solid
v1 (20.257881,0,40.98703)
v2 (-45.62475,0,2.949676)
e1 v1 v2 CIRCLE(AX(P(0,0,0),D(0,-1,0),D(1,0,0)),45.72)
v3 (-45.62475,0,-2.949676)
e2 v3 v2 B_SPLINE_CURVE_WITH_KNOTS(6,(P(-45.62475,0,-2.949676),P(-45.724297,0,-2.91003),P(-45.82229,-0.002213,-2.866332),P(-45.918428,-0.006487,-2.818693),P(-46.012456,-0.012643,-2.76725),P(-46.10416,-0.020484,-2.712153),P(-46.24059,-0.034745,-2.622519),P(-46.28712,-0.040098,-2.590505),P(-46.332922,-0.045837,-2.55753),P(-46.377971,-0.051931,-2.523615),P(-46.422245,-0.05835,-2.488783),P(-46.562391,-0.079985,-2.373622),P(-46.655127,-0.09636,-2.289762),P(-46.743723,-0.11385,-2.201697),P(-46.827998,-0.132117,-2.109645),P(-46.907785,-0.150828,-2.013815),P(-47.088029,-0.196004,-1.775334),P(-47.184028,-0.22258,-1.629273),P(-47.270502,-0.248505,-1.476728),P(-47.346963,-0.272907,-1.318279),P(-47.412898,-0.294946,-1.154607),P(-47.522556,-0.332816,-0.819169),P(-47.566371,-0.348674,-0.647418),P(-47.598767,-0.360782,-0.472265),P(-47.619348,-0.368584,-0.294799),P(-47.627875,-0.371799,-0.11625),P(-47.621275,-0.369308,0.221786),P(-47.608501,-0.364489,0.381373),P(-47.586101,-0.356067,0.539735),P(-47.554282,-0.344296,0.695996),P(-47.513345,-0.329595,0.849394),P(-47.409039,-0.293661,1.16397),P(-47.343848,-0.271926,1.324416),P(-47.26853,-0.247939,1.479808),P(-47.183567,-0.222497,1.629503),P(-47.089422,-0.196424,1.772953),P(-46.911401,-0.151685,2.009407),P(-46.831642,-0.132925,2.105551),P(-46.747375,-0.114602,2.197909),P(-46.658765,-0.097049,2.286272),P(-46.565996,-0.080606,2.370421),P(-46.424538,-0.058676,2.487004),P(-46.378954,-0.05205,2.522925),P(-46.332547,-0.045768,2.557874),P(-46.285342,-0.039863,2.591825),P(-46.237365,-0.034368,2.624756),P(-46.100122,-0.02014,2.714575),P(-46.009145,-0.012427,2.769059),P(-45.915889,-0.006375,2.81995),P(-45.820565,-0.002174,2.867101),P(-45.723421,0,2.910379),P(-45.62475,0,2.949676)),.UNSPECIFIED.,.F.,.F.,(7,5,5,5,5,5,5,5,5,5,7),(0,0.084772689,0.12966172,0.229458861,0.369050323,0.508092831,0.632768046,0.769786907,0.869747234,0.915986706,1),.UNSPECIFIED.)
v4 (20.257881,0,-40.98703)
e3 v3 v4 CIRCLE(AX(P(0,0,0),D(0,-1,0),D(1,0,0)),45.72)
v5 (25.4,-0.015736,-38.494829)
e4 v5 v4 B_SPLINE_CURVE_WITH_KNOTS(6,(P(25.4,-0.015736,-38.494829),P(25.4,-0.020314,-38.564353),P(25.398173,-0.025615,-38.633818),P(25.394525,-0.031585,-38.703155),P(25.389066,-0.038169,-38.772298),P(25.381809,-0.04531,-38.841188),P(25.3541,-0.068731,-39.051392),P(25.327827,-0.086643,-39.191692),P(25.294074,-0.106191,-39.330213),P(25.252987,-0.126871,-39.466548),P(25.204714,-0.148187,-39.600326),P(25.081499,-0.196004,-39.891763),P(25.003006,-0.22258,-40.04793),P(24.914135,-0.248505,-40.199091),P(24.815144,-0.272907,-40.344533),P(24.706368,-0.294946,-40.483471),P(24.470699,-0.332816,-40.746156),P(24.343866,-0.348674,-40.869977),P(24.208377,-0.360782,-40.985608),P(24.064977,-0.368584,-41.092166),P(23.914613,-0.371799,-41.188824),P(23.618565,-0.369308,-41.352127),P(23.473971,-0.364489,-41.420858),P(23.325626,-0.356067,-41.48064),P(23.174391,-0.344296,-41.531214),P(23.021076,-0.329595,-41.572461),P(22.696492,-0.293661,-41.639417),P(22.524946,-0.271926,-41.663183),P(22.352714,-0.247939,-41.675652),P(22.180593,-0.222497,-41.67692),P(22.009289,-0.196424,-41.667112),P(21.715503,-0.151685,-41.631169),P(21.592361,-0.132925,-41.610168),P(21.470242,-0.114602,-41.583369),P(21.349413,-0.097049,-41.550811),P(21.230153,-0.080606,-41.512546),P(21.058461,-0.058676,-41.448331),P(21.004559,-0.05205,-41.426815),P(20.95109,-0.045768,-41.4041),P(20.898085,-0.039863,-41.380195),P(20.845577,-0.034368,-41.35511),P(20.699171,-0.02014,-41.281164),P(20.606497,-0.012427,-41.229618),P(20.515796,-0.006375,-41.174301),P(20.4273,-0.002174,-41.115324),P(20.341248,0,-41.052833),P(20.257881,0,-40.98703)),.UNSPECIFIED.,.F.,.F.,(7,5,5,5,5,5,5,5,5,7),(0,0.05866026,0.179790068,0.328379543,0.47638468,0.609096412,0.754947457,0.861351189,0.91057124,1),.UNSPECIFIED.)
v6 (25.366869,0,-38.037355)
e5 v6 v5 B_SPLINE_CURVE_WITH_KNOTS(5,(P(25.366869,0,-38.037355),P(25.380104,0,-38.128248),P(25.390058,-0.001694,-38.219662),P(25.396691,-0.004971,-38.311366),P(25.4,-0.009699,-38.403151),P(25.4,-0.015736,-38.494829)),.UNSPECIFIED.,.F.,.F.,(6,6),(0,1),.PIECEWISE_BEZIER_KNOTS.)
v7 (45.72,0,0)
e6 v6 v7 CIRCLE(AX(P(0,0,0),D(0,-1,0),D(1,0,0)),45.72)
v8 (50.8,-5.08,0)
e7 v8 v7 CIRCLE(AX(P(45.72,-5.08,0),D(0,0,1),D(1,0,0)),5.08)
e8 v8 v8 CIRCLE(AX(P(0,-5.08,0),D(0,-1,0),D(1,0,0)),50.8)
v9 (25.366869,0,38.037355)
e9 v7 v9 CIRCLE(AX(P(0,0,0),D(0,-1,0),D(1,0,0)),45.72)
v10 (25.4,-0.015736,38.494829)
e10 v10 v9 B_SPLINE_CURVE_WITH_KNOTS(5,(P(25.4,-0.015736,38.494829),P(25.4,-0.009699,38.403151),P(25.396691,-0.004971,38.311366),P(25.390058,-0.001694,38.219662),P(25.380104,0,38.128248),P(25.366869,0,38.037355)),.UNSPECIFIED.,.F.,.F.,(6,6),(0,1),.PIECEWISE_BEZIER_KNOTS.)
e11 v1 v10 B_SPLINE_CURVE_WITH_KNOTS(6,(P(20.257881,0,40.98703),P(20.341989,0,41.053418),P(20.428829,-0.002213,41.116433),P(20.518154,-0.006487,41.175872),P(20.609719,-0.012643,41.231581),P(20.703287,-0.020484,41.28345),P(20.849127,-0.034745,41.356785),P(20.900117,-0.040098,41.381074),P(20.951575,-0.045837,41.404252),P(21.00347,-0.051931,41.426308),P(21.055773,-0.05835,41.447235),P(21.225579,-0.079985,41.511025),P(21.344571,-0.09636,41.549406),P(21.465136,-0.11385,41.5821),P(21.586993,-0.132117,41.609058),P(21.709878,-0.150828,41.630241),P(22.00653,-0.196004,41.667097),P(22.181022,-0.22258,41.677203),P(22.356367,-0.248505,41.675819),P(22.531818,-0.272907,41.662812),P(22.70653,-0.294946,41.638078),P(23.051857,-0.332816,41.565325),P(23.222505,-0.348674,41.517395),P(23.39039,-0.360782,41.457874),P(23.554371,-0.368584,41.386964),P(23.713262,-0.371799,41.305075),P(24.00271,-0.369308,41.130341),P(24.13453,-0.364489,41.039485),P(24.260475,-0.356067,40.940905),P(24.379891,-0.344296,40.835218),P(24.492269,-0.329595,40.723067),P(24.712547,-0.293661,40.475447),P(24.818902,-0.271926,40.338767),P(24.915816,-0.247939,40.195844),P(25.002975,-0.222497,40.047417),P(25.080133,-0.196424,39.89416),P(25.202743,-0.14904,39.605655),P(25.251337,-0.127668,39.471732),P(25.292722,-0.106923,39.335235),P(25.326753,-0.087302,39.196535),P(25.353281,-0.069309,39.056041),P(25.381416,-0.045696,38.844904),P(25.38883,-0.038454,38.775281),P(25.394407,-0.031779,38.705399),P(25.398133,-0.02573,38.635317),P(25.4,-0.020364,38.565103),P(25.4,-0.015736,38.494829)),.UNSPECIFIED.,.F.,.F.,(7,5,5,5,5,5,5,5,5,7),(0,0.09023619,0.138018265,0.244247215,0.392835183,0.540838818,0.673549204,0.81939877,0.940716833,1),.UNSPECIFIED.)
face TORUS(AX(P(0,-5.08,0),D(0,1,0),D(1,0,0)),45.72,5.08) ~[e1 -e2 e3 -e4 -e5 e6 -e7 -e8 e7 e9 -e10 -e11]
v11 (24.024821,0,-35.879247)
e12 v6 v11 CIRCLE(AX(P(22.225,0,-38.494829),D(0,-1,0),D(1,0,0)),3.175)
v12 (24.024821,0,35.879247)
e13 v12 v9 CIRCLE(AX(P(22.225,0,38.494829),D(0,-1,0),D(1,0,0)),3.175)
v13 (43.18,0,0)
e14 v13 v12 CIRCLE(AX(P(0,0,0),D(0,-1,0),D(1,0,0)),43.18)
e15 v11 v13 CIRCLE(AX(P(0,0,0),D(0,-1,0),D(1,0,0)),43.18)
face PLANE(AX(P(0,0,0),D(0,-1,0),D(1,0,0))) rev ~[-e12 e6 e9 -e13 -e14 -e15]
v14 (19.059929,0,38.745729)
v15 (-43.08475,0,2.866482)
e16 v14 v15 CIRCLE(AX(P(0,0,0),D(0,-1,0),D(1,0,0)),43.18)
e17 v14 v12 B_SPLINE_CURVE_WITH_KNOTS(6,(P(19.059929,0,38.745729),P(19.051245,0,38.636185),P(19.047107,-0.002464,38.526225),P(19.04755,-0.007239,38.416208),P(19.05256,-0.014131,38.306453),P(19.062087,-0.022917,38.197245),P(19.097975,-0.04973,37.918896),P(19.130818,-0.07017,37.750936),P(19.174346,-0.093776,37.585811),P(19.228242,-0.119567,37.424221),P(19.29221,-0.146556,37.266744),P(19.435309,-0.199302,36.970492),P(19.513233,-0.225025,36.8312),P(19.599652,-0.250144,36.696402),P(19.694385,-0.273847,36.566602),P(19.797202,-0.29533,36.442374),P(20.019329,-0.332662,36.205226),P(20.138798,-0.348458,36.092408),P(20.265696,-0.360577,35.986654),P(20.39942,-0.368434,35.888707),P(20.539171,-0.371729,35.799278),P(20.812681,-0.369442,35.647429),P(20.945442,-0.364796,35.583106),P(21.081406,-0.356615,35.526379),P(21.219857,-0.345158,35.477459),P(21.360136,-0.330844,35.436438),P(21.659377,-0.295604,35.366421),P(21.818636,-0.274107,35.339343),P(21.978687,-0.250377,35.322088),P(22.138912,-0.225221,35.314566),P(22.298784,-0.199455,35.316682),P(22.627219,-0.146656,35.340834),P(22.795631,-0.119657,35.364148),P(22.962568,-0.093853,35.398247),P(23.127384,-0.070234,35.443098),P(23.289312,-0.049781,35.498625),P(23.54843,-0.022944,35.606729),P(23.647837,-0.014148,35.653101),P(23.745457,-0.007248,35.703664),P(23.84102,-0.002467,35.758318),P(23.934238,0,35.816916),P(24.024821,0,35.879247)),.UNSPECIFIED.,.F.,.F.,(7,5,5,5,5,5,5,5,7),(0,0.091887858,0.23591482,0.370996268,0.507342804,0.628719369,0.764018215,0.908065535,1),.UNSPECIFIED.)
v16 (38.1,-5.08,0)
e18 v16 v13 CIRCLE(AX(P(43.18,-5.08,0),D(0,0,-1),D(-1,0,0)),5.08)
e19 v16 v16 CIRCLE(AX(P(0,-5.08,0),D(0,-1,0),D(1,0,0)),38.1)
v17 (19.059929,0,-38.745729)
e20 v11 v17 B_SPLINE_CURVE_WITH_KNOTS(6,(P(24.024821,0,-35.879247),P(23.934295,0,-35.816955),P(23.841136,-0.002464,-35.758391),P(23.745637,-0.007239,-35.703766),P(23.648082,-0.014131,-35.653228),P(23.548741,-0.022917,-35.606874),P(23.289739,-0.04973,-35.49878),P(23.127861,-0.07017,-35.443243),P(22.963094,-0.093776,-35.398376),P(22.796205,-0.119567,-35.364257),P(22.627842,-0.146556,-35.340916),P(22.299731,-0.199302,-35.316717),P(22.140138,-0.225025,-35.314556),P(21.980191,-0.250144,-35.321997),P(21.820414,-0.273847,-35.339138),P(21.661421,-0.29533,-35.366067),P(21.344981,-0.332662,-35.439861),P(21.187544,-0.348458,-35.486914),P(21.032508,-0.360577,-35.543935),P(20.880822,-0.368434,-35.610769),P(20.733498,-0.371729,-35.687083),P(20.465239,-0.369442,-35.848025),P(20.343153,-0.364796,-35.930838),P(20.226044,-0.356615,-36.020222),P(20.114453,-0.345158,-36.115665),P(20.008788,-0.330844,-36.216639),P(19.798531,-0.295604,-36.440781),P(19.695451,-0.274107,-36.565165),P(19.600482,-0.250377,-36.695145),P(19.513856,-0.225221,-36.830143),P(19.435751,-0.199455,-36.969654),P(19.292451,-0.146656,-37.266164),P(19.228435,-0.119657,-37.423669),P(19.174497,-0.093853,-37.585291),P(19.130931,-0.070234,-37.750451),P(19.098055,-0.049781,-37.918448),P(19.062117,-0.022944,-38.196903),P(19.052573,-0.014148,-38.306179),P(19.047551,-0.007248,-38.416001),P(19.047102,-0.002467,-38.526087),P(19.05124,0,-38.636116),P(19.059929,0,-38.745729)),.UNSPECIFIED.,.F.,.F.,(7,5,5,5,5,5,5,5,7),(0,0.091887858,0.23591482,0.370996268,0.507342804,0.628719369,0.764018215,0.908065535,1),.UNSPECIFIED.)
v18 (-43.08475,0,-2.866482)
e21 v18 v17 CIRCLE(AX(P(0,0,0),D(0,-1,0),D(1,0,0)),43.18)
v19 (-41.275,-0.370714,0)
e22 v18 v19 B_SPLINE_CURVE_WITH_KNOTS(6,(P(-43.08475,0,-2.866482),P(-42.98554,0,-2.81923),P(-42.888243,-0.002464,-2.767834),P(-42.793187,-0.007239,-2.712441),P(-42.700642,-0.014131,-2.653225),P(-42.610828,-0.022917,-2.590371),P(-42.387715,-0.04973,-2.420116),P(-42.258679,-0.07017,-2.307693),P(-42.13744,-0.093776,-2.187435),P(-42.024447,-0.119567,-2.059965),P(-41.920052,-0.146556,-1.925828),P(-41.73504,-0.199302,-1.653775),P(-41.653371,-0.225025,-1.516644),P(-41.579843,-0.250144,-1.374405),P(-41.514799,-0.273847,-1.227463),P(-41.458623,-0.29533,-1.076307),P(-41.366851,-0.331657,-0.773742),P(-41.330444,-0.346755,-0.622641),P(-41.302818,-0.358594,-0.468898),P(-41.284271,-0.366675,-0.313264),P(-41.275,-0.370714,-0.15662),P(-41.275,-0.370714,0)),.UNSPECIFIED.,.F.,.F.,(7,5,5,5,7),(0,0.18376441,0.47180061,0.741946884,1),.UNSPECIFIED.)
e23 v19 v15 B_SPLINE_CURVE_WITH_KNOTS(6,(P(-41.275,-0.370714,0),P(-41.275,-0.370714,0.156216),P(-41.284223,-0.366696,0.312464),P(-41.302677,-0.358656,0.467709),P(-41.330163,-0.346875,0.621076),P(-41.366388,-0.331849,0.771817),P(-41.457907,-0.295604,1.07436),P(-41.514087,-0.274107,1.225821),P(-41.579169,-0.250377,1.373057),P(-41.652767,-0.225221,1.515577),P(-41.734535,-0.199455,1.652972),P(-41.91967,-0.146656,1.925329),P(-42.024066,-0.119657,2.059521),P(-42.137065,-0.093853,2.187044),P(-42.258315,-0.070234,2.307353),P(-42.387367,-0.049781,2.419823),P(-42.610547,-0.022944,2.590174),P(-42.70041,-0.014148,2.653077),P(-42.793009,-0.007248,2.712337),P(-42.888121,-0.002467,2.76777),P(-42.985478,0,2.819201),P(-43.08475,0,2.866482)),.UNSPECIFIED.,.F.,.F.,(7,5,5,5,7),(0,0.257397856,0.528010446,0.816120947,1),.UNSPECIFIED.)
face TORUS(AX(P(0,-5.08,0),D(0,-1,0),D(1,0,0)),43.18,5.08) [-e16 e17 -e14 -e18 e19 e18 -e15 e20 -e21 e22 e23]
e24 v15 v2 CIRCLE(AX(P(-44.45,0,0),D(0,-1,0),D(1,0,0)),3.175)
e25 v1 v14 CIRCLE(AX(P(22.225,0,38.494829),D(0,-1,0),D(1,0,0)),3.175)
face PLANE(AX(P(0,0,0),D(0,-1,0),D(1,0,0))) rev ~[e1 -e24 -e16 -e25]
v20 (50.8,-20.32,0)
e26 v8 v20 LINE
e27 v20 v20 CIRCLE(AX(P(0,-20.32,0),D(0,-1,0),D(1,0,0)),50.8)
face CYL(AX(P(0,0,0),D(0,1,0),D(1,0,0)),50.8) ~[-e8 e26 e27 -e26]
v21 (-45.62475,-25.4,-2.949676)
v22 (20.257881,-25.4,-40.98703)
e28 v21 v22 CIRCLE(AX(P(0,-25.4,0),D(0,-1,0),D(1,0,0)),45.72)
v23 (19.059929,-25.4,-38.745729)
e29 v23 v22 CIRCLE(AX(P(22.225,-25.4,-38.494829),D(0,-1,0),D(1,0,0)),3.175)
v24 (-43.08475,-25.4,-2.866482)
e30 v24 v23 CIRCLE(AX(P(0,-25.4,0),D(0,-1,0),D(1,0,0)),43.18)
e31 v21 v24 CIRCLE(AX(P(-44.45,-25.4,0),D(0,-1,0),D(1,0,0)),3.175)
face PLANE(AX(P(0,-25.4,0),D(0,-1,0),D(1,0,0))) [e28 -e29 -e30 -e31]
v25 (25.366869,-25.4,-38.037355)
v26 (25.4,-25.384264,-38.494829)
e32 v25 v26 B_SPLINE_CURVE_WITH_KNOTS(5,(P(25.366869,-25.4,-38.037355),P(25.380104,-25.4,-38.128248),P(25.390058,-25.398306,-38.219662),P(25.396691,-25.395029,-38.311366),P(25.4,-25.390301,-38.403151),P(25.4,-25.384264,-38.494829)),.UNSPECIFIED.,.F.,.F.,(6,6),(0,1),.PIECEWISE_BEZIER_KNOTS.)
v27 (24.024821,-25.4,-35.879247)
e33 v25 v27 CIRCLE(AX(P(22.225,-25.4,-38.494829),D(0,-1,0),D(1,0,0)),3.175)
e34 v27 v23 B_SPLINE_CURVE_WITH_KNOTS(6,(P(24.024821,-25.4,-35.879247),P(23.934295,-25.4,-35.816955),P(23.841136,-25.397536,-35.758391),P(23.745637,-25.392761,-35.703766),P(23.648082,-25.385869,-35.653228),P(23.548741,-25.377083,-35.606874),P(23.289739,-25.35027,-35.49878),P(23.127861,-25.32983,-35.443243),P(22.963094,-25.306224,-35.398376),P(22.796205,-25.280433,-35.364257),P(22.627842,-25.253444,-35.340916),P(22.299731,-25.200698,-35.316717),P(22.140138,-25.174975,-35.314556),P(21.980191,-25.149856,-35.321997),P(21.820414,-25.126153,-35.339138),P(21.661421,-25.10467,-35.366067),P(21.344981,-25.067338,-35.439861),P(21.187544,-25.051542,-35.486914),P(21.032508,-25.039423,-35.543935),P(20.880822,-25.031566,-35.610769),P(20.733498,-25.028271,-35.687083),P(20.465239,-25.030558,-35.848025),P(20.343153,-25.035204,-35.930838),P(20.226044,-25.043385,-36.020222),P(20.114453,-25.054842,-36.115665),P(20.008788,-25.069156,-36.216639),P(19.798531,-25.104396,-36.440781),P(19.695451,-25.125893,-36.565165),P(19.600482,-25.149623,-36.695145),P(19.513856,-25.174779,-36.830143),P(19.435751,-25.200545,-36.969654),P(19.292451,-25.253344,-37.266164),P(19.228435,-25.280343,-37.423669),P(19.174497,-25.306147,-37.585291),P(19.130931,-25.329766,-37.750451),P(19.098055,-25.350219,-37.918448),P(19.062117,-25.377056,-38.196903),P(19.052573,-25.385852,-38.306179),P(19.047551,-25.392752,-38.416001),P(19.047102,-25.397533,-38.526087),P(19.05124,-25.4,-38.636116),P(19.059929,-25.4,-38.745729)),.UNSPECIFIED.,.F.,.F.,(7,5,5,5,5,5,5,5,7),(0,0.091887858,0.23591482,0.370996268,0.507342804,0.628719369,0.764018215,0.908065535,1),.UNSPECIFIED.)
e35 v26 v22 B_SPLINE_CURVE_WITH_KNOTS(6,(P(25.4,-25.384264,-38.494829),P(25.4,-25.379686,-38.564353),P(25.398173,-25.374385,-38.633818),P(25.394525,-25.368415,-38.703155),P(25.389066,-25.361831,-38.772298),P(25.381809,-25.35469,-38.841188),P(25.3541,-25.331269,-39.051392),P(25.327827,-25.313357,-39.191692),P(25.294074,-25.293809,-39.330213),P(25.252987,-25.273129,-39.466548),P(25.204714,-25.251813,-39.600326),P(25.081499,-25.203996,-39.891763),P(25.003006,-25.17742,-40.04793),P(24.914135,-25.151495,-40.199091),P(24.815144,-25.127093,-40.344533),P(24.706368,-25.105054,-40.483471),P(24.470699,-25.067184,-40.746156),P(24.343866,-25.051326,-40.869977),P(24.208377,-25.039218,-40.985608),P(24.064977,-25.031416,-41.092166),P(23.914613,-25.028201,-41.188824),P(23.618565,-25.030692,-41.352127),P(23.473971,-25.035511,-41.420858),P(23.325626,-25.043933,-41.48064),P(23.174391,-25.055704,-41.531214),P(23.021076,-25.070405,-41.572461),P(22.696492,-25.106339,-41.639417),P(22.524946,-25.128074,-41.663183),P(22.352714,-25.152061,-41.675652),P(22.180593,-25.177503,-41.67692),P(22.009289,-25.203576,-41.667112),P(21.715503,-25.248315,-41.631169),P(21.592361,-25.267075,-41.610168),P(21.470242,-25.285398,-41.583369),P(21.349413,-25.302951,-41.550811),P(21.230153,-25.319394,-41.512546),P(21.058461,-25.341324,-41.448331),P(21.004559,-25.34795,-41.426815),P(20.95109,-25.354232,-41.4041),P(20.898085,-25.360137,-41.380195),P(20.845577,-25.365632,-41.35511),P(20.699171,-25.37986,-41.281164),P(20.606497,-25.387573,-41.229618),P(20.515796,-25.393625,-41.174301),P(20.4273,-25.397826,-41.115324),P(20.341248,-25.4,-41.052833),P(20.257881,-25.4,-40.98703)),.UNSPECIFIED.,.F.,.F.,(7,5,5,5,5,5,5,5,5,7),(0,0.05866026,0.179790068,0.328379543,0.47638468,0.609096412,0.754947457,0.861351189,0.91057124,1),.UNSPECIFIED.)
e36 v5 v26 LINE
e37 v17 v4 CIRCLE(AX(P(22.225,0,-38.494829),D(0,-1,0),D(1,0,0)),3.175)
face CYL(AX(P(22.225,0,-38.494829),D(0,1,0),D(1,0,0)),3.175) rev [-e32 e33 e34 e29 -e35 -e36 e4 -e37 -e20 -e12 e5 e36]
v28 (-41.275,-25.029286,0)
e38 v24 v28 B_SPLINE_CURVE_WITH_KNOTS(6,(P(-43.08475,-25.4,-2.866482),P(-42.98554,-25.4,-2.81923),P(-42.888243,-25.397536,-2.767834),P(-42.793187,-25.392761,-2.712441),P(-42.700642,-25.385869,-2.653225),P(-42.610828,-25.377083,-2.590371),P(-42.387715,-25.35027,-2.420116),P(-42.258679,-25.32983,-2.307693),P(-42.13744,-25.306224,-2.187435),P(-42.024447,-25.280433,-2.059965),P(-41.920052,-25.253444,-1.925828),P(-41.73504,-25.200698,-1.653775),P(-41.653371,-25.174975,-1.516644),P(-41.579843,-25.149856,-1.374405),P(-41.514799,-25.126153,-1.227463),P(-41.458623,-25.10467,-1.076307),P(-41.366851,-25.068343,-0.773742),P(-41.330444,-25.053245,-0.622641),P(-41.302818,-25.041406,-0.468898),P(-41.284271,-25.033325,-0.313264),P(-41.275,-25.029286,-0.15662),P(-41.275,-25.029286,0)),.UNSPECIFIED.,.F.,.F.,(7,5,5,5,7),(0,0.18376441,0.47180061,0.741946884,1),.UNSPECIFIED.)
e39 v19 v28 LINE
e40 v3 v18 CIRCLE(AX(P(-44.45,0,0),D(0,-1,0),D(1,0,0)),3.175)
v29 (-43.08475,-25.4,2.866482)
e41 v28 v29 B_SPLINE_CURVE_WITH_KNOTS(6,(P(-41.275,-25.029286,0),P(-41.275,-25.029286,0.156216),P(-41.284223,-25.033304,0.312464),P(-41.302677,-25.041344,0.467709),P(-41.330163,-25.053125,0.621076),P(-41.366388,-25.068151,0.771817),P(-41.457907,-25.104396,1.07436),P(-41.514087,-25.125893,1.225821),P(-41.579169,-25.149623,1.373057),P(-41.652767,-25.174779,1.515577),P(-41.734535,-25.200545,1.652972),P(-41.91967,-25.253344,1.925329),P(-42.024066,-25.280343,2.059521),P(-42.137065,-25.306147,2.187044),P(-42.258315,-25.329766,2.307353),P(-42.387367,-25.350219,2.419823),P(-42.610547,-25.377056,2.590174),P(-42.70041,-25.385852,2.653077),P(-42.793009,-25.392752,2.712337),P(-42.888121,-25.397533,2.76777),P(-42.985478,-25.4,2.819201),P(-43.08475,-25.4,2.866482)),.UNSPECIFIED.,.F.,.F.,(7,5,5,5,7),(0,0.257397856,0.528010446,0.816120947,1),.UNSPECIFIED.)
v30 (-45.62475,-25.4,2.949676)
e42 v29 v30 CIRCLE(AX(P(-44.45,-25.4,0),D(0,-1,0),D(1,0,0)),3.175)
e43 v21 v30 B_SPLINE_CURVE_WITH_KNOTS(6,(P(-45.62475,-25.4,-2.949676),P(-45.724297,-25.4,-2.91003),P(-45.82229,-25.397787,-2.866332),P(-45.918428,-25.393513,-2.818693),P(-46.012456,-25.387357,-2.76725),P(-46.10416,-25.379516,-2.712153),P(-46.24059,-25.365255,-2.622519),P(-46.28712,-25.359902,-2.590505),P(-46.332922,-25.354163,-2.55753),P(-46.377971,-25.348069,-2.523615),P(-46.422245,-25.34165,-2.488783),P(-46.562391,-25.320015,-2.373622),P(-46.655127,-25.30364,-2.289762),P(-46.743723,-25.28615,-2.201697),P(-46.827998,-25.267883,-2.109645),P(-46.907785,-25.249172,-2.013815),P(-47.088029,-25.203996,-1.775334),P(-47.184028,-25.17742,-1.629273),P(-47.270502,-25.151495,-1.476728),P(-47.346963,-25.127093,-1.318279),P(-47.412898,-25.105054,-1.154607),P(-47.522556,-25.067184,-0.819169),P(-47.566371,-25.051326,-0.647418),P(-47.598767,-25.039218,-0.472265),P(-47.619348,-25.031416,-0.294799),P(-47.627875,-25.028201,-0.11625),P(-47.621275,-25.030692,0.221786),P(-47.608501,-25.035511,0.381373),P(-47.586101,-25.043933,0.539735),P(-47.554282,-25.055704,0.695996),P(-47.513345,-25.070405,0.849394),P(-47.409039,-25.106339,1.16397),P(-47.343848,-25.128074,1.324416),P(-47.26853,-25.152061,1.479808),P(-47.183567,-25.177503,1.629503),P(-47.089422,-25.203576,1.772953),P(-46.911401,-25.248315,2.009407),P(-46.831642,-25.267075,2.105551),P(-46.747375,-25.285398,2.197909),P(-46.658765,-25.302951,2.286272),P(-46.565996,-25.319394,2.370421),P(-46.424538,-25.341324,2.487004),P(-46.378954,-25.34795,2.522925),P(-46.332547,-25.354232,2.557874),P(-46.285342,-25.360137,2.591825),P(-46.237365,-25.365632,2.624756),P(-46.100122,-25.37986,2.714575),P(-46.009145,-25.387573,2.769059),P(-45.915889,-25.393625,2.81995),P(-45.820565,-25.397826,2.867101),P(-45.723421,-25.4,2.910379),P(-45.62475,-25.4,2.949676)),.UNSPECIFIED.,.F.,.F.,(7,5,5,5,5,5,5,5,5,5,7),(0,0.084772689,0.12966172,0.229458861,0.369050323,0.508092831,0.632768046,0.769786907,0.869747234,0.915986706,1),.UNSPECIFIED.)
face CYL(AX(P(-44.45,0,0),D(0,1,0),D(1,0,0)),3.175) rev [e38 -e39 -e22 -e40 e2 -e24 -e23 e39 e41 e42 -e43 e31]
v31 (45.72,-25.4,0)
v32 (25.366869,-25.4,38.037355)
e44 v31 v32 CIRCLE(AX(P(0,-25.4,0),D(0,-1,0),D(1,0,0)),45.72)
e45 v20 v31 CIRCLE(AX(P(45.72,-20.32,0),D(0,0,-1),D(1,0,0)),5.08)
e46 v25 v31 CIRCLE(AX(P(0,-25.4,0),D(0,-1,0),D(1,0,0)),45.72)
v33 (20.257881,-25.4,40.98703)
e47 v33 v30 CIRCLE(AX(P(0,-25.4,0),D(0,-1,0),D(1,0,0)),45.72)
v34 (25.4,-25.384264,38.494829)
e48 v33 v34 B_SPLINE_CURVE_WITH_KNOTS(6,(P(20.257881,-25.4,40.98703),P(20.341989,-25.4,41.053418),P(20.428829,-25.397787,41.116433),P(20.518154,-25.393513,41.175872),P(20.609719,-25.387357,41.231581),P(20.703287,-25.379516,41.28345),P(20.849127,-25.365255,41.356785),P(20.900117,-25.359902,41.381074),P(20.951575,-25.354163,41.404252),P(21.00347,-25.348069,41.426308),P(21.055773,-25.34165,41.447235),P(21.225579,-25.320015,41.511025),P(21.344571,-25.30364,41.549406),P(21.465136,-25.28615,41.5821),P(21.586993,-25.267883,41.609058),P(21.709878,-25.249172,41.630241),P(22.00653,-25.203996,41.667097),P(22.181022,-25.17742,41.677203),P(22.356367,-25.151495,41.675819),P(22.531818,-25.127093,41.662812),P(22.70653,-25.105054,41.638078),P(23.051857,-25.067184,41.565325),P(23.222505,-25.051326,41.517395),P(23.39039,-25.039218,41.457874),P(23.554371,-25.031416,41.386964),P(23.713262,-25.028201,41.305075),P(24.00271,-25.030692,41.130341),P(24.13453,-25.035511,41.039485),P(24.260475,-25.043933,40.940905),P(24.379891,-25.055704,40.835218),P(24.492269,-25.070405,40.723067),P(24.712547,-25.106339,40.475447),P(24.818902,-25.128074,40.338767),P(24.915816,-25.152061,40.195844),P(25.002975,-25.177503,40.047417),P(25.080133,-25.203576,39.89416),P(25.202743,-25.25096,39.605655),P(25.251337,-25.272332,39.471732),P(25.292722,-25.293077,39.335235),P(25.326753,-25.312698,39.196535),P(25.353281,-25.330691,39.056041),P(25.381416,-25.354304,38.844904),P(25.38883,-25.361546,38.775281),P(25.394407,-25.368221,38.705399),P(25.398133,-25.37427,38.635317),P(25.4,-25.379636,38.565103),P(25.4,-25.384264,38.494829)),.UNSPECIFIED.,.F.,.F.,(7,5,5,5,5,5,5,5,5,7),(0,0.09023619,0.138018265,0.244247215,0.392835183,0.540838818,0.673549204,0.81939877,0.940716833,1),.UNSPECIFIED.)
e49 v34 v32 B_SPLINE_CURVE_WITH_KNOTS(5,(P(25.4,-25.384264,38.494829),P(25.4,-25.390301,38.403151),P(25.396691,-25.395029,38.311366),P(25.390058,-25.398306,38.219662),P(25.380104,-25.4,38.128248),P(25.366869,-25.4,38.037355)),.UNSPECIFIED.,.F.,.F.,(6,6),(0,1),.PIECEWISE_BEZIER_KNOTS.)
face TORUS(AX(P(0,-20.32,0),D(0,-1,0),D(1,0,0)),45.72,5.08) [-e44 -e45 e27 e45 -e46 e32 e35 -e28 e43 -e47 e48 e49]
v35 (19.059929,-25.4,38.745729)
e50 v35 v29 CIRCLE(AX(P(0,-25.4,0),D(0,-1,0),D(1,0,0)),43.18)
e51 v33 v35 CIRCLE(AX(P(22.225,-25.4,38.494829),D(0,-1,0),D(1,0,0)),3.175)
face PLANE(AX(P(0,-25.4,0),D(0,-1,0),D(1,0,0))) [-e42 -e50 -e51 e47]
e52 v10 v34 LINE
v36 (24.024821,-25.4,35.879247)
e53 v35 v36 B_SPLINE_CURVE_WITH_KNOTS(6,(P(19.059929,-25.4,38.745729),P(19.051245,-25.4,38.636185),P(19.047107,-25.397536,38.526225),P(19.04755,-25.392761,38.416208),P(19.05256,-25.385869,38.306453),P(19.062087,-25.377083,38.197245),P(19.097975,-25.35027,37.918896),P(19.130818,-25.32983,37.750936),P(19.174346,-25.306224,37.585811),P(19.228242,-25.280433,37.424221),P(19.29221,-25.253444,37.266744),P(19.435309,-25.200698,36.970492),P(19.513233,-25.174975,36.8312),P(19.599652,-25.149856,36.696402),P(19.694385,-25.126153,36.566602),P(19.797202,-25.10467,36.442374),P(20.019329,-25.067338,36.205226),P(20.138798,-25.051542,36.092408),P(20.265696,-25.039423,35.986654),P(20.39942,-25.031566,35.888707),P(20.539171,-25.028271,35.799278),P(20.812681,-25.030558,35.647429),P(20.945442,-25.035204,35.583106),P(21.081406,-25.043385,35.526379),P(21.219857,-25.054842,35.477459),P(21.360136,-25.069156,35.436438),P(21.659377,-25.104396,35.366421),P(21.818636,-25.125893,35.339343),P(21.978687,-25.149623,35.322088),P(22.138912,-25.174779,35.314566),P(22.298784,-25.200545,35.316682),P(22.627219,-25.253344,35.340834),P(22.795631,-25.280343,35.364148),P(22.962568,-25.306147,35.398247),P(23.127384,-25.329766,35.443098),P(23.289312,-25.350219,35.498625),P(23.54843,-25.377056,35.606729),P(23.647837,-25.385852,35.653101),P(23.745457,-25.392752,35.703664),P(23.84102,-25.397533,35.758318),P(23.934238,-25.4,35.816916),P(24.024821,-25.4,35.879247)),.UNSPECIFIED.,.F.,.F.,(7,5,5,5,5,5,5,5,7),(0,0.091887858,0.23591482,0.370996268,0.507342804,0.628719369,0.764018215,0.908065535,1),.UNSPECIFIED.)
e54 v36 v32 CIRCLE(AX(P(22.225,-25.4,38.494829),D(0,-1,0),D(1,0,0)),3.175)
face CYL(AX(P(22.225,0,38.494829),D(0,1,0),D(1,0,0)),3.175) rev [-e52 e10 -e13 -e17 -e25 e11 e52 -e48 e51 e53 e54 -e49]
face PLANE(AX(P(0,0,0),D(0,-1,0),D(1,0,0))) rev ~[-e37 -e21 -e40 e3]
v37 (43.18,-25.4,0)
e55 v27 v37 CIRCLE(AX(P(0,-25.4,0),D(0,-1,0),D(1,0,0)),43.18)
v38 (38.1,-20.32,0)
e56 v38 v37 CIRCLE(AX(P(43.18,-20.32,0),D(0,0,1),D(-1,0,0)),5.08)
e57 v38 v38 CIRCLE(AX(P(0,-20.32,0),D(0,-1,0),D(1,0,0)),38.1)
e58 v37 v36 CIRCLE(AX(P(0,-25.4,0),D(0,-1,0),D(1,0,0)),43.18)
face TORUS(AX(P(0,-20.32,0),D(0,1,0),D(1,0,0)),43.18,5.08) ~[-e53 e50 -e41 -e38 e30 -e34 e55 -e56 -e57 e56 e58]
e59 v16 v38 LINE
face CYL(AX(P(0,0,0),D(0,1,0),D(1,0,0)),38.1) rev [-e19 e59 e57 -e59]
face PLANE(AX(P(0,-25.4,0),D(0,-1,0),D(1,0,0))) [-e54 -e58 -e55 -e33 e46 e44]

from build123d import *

# Parameters (mm, degrees)
F0_R     = 50.8
F0_R_2   = 3.175
F0_R_3   = 38.1
F1_DEPTH = 25.4


# Not quite as in the source:
# - a fillet or chamfer that OpenCascade refuses, or shapes differently, is made with other operations: its cross-section is extruded or revolved along the edge and cut away or added


with BuildPart() as f1:
    # F0 (on Front) → F1 (new body)
    with BuildSketch(Plane.XZ):
        Circle(F0_R)
        with Locations((-44.45, 0)):
            Circle(F0_R_2, mode=Mode.SUBTRACT)
        Circle(F0_R_3, mode=Mode.SUBTRACT)
        with Locations((22.225, -38.4948291982)):
            Circle(F0_R_2, mode=Mode.SUBTRACT)
        with Locations((22.225, 38.4948291982)):
            Circle(F0_R_2, mode=Mode.SUBTRACT)
    extrude(amount=F1_DEPTH)

    # F2: fillet of radius 5.08 on 4 edges, made by hand

    # F2_s1 → F2_t2 (revolve, cut)
    with BuildSketch(Plane.XY):
        with BuildLine():
            ThreePointArc((50.8, -5.08), (49.3121024484, -1.4878975516), (45.72, 0))
            Line((45.72, 0), (50.8, 0))
            Line((50.8, 0), (50.8, -5.08))
        make_face()
    revolve(axis=Axis((0, 0, 0), (0, -1, 0)), mode=Mode.SUBTRACT)

    # F2_s3 → F2_t4 (revolve, cut)
    with BuildSketch(Plane.XY):
        with BuildLine():
            ThreePointArc((38.1, -5.08), (39.5878975516, -1.4878975516), (43.18, 0))
            Line((43.18, 0), (38.1, 0))
            Line((38.1, 0), (38.1, -5.08))
        make_face()
    revolve(axis=Axis((0, 0, 0), (0, -1, 0)), mode=Mode.SUBTRACT)

    # F2_s5 → F2_t6 (revolve, cut)
    with BuildSketch(Plane.XY):
        with BuildLine():
            ThreePointArc((38.1, -20.32), (39.5878975516, -23.9121024484), (43.18, -25.4))
            Line((43.18, -25.4), (38.1, -25.4))
            Line((38.1, -25.4), (38.1, -20.32))
        make_face()
    revolve(axis=Axis((0, -25.4, 0), (0, -1, 0)), mode=Mode.SUBTRACT)

    # F2_s7 → F2_t8 (revolve, cut)
    with BuildSketch(Plane.XY):
        with BuildLine():
            ThreePointArc((50.8, -20.32), (49.3121024484, -23.9121024484), (45.72, -25.4))
            Line((45.72, -25.4), (50.8, -25.4))
            Line((50.8, -25.4), (50.8, -20.32))
        make_face()
    revolve(axis=Axis((0, -25.4, 0), (0, -1, 0)), mode=Mode.SUBTRACT)


solid = f1.part
